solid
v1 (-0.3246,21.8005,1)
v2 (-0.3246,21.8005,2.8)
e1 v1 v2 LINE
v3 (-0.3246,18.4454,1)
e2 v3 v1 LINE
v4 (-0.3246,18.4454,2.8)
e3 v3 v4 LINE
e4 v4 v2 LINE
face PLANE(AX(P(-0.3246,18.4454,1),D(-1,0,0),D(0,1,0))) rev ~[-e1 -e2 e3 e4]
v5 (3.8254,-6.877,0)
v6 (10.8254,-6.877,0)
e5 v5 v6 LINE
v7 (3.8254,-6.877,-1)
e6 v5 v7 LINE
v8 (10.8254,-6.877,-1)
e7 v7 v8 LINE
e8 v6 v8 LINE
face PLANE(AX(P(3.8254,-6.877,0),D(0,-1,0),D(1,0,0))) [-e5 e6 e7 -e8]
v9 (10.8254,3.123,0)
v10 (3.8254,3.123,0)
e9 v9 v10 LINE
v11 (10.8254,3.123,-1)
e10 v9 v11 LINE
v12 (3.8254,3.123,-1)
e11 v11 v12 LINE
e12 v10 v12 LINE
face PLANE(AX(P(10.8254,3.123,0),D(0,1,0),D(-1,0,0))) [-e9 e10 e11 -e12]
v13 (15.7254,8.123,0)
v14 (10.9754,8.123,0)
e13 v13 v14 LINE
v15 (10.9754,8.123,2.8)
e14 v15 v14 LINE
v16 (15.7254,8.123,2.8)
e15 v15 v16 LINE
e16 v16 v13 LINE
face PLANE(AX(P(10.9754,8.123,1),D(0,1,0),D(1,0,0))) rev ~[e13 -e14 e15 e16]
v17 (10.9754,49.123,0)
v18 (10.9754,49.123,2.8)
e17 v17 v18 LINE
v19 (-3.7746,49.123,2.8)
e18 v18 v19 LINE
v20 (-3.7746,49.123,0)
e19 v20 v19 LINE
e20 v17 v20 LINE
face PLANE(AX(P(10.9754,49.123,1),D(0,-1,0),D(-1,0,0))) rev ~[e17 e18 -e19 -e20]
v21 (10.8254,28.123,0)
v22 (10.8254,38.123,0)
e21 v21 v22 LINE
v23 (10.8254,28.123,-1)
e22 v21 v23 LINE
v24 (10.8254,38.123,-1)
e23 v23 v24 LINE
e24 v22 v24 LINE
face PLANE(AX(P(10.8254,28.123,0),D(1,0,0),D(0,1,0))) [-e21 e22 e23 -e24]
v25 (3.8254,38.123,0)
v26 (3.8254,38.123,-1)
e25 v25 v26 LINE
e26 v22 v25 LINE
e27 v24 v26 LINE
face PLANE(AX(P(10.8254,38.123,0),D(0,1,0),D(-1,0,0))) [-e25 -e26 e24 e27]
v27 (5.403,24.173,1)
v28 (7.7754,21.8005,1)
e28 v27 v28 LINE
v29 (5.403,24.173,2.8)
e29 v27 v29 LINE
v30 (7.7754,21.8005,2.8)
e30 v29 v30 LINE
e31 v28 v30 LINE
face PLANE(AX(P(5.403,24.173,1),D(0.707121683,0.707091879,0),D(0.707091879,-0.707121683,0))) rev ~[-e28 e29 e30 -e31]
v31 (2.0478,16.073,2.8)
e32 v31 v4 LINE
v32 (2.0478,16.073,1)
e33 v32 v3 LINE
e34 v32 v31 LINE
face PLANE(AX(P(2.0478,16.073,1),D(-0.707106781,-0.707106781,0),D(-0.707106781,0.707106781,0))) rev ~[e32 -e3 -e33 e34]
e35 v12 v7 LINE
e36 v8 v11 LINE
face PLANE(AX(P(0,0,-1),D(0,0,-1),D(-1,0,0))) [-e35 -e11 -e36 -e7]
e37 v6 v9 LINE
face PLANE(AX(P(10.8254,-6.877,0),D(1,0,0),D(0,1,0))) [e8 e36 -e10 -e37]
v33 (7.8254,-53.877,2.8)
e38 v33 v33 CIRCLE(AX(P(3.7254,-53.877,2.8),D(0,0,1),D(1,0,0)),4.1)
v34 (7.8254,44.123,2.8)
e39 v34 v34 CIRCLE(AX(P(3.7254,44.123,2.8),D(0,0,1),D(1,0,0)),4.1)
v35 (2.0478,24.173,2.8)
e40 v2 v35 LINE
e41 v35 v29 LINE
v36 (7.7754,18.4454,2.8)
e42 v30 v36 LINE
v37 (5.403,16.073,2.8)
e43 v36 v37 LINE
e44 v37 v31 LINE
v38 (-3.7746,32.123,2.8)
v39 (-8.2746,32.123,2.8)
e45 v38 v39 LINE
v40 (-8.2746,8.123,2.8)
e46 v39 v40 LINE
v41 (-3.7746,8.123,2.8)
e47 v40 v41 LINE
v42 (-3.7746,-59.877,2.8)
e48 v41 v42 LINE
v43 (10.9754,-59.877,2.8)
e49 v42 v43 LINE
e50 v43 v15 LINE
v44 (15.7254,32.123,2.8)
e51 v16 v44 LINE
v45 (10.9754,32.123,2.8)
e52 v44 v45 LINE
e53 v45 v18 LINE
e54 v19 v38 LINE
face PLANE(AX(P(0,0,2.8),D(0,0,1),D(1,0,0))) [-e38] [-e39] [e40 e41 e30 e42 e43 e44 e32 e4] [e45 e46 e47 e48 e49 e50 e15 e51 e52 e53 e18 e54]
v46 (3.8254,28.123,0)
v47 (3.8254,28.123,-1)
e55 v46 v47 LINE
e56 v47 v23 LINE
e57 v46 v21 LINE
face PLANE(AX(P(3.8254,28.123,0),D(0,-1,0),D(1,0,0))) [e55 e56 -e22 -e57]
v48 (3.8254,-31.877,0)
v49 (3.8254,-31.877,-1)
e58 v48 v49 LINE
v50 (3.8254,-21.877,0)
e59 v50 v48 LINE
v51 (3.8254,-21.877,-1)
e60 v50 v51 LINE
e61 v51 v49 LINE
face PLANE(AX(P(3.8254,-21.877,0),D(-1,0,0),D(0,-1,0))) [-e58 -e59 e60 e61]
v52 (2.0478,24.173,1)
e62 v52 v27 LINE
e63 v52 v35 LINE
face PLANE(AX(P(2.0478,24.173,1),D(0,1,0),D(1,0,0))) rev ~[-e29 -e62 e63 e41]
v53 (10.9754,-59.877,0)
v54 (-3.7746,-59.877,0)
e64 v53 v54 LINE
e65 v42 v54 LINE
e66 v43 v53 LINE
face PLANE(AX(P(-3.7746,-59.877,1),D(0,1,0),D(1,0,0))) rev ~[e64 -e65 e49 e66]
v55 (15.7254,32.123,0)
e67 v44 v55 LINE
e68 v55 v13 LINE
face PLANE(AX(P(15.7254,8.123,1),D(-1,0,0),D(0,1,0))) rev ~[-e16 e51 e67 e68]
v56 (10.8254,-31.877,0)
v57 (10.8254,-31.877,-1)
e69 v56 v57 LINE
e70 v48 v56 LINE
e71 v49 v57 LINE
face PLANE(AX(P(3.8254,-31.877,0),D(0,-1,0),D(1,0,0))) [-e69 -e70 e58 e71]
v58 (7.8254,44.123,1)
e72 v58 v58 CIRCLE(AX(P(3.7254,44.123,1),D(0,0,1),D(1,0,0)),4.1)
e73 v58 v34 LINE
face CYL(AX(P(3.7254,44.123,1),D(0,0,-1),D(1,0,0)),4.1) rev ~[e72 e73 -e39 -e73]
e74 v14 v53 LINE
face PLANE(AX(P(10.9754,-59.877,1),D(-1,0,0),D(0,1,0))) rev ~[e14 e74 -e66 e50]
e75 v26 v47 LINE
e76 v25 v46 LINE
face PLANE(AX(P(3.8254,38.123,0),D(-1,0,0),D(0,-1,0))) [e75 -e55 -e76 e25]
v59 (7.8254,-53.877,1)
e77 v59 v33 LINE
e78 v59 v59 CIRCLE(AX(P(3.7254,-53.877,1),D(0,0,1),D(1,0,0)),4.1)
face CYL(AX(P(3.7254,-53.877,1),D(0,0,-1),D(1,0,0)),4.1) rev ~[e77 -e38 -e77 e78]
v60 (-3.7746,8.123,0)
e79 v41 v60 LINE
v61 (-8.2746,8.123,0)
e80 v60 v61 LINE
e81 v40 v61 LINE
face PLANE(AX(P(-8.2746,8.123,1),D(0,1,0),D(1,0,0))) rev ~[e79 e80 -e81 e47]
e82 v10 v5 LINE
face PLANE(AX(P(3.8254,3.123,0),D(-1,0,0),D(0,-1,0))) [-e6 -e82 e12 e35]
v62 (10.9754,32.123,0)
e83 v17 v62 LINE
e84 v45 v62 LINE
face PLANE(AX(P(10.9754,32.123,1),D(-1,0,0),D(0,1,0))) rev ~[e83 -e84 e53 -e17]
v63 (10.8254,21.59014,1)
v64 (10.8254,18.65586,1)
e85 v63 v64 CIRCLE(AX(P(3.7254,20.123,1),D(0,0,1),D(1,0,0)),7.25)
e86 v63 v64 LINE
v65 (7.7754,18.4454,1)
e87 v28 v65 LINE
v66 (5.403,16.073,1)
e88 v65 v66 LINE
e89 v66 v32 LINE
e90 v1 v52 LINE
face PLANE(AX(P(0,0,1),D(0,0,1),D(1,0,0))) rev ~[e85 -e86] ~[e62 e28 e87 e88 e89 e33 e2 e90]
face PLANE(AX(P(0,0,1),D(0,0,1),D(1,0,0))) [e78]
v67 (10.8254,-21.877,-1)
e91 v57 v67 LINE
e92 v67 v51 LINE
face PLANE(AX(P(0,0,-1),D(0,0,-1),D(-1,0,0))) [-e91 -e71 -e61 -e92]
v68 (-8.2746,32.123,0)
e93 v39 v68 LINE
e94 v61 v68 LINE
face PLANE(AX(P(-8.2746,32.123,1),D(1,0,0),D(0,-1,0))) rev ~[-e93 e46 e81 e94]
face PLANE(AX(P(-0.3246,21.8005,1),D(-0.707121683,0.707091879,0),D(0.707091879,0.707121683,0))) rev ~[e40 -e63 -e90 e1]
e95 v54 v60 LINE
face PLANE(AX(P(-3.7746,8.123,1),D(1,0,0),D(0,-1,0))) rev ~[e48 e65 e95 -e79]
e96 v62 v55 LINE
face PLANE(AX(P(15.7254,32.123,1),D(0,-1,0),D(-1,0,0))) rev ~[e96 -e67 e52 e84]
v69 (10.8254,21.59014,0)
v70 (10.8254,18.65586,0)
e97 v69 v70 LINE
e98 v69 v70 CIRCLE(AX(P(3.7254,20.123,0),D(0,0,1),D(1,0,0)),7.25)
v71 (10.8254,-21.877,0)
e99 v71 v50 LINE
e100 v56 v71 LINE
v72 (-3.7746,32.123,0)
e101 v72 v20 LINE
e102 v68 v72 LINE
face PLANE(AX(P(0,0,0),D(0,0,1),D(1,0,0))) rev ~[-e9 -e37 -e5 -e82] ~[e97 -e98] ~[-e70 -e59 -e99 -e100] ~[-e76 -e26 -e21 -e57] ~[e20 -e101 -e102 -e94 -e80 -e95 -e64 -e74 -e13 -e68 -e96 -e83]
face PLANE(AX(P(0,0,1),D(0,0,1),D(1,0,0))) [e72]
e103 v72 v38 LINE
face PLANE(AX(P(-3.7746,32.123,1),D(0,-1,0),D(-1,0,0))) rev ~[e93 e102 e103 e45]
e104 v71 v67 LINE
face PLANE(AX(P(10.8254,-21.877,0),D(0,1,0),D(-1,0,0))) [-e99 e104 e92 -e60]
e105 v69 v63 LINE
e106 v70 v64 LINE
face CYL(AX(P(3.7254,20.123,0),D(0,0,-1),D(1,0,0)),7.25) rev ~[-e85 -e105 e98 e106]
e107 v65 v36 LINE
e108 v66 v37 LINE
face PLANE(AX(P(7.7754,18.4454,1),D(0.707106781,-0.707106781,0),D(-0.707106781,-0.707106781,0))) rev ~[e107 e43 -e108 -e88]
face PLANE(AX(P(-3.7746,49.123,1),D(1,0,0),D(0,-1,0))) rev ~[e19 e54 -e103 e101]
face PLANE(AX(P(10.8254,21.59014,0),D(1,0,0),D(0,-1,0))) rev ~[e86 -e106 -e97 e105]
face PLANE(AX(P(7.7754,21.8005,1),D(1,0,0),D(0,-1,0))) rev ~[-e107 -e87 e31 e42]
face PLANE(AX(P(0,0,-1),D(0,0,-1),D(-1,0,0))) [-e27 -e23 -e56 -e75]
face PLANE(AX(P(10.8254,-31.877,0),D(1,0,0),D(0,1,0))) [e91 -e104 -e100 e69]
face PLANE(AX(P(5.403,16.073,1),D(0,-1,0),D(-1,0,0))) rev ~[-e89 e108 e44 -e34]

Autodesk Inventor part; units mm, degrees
ref_plane "YZ Plane" through (0, 0, 0) normal (1, 0, 0) x (0, 1, 0)
ref_plane "XZ Plane" through (0, 0, 0) normal (0, 1, 0) x (-1, 0, 0)
ref_plane "XY Plane" through (0, 0, 0) normal (0, 0, 1) x (1, 0, 0)
ref_plane "Arbeitsebene1" through (0, 0, 0) normal (0, 0, 1) x (1, 0, 0)
sketch "Skizze1" plane through (0, 0, 0) normal (0, 0, 1) x (1, 0, 0)
  circle A0 centre (-26.7746, 32.123) radius 1.5 construction
  circle A1 centre (15.7254, 11.123) radius 1.5 construction
  circle A2 centre (-26.2746, -24.877) radius 1.5 construction
  circle A3 centre (12.7254, -26.877) radius 1.5 construction
  circle A4 centre (12.7254, 30.123) radius 1.5 construction
  line L0 (11.0254, 3.323) -> (11.0254, -7.077) construction
  line L1 (11.0254, -7.077) -> (3.6254, -7.077) construction
  line L2 (3.6254, -7.077) -> (3.6254, 3.323) construction
  line L3 (3.6254, 3.323) -> (11.0254, 3.323) construction
  line L4 (3.6254, -32.077) -> (3.6254, -21.677) construction
  line L5 (3.6254, -21.677) -> (11.0254, -21.677) construction
  line L6 (11.0254, -21.677) -> (11.0254, -32.077) construction
  line L7 (11.0254, -32.077) -> (3.6254, -32.077) construction
  line L8 (11.0254, 27.923) -> (3.6254, 27.923) construction
  line L9 (3.6254, 27.923) -> (3.6254, 38.323) construction
  line L10 (3.6254, 38.323) -> (11.0254, 38.323) construction
  line L11 (11.0254, 38.323) -> (11.0254, 27.923) construction
  line L12 (-28.2746, 30.123) -> (-28.2746, -34.877) construction
  line L13 (-28.2746, -34.877) -> (-3.7746, -34.877) construction
  line L14 (-3.7746, -34.877) -> (-3.7746, -59.877) construction
  line L15 (-3.7746, -59.877) -> (10.8254, -59.877) construction
  line L16 (10.8254, -59.877) -> (10.8254, -34.877) construction
  line L17 (10.8254, -34.877) -> (20.2254, -34.877) construction
  line L18 (20.2254, -34.877) -> (20.2254, 39.123) construction
  line L19 (20.2254, 39.123) -> (10.8254, 39.123) construction
  line L20 (10.8254, 39.123) -> (10.8254, 49.123) construction
  line L21 (10.8254, 49.123) -> (-3.7746, 49.123) construction
  line L22 (-3.7746, 49.123) -> (-3.7746, 39.123) construction
  line L23 (-3.7746, 39.123) -> (-29.2746, 39.123) construction
  line L24 (-29.2746, 39.123) -> (-29.2746, 30.123) construction
  line L25 (-29.2746, 30.123) -> (-28.2746, 30.123) construction
  circle A5 centre (3.7254, 20.123) radius 7.5 construction
  line L26 (-3.7746, 49.123) -> (10.8254, 49.123) construction
  line L27 (10.8254, 49.123) -> (10.8254, -59.877) construction
  line L28 (10.8254, -59.877) -> (-3.7746, -59.877) construction
  line L29 (-3.7746, -59.877) -> (-3.7746, 49.123) construction
  line L30 (-3.7746, 49.123) -> (10.8254, 49.123)
  line L31 (10.8254, 49.123) -> (10.8254, -59.877)
  line L32 (10.8254, -59.877) -> (-3.7746, -59.877)
  line L33 (-3.7746, -59.877) -> (-3.7746, 49.123)
  circle A6 centre (3.7254, 44.123) radius 4.1 projected
  circle A7 centre (3.7254, -53.877) radius 4.1 projected
  line L34 (-8.2746, 32.123) -> (15.7254, 32.123)
  line L35 (15.7254, 32.123) -> (15.7254, 8.123)
  line L36 (15.7254, 8.123) -> (-8.2746, 8.123)
  line L37 (-8.2746, 8.123) -> (-8.2746, 32.123)
  line L38 (-8.2746, 32.123) -> (15.7254, 8.123) construction
  line L39 (15.7254, 32.123) -> (-8.2746, 8.123) construction
  circle A8 centre (3.7254, 20.123) radius 7.5
  circle A9 centre (3.7254, 20.123) radius 7.25
  line L40 (10.8254, 49.123) -> (10.9754, 49.123)
  line L41 (10.9754, 49.123) -> (10.9754, -59.877)
  line L42 (10.9754, -59.877) -> (10.8254, -59.877)
  line L43 (10.8254, -59.877) -> (10.8254, 49.123)
  point P0 (0, 0)
  dimension "d0" = 24
  dimension "d1" = 24
  dimension "d2" = 14.5
  dimension "d5" = 0.15
extrude "Extrusion1" add sketch "Skizze1" along normal blind 1 contours L30 L31 L34 L33 | L40 L41 L34 L31 | L34 L31 A8 L33 | L33 L36 L37 L34 | L34 L41 A8 L31 | A8 L31 L36 L33 | A8 L31 A9 | A8 L41 A9 L31 | L34 L35 L36 L41 A8 | L36 L31 L32 L33 | A8 L41 L36 L31 | L31 A9 L41 A8 | A9 L31 | A8 L41 | L36 L41 L42 L31 | A6 | A7 picked at (10.8531, 19.7957)
sketch "Skizze2" plane through (0, 0, 0) normal (0, 0, -1) x (-1, 0, 0)
  circle A0 centre (26.7746, 32.123) radius 1.5 projected
  circle A1 centre (-15.7254, 11.123) radius 1.5 projected
  circle A2 centre (26.2746, -24.877) radius 1.5 projected
  circle A3 centre (-12.7254, -26.877) radius 1.5 projected
  circle A4 centre (-12.7254, 30.123) radius 1.5 projected
  line L0 (-11.0254, 3.323) -> (-11.0254, -7.077) projected
  line L1 (-11.0254, -7.077) -> (-3.6254, -7.077) projected
  line L2 (-3.6254, -7.077) -> (-3.6254, 3.323) projected
  line L3 (-3.6254, 3.323) -> (-11.0254, 3.323) projected
  line L4 (-3.6254, -32.077) -> (-3.6254, -21.677) projected
  line L5 (-3.6254, -21.677) -> (-11.0254, -21.677) projected
  line L6 (-11.0254, -21.677) -> (-11.0254, -32.077) projected
  line L7 (-11.0254, -32.077) -> (-3.6254, -32.077) projected
  line L8 (-11.0254, 27.923) -> (-3.6254, 27.923) projected
  line L9 (-3.6254, 27.923) -> (-3.6254, 38.323) projected
  line L10 (-3.6254, 38.323) -> (-11.0254, 38.323) projected
  line L11 (-11.0254, 38.323) -> (-11.0254, 27.923) projected
  line L12 (28.2746, 30.123) -> (28.2746, -34.877) projected
  line L13 (28.2746, -34.877) -> (3.7746, -34.877) projected
  line L14 (3.7746, -34.877) -> (3.7746, -59.877) projected
  line L15 (3.7746, -59.877) -> (-10.8254, -59.877) projected
  line L16 (-10.8254, -59.877) -> (-10.8254, -34.877) projected
  line L17 (-10.8254, -34.877) -> (-20.2254, -34.877) projected
  line L18 (-20.2254, -34.877) -> (-20.2254, 39.123) projected
  line L19 (-20.2254, 39.123) -> (-10.8254, 39.123) projected
  line L20 (-10.8254, 39.123) -> (-10.8254, 49.123) projected
  line L21 (-10.8254, 49.123) -> (3.7746, 49.123) projected
  line L22 (3.7746, 49.123) -> (3.7746, 39.123) projected
  line L23 (3.7746, 39.123) -> (29.2746, 39.123) projected
  line L24 (29.2746, 39.123) -> (29.2746, 30.123) projected
  line L25 (29.2746, 30.123) -> (28.2746, 30.123) projected
  circle A5 centre (-3.7254, 20.123) radius 7.5 projected
  line L26 (-3.8254, 38.123) -> (-3.8254, 28.123)
  line L27 (-3.8254, 28.123) -> (-10.8254, 28.123)
  line L28 (-10.8254, 28.123) -> (-10.8254, 38.123)
  line L29 (-10.8254, 38.123) -> (-3.8254, 38.123)
  line L30 (-3.8254, 3.123) -> (-3.8254, -6.877)
  line L31 (-3.8254, -6.877) -> (-10.8254, -6.877)
  line L32 (-10.8254, -6.877) -> (-10.8254, 3.123)
  line L33 (-10.8254, 3.123) -> (-3.8254, 3.123)
  line L34 (-10.8254, -21.877) -> (-3.8254, -21.877)
  line L35 (-3.8254, -21.877) -> (-3.8254, -31.877)
  line L36 (-3.8254, -31.877) -> (-10.8254, -31.877)
  line L37 (-10.8254, -31.877) -> (-10.8254, -21.877)
  point P0 (0, 0)
  dimension "d7" = 0.2
  dimension "d8" = 0.2
  dimension "d9" = 0.2
extrude "Extrusion2" add sketch "Skizze2" along normal blind 1 contours L26 L27 L28 L29 | L30 L31 L32 L33 | L34 L35 L36 L37
sketch "Skizze3" plane through (0, 0, 1) normal (0, 0, 1) x (1, 0, 0)
  circle A0 centre (3.7254, 20.123) radius 3.5 construction
  arc A1 (-0.3746, 17.023) -> (0.6254, 16.023) centre (0.6254, 17.023) ccw construction
  line L0 (0.6254, 16.023) -> (6.8254, 16.023) construction
  arc A2 (6.8254, 16.023) -> (7.8254, 17.023) centre (6.8254, 17.023) ccw construction
  line L1 (7.8254, 17.023) -> (7.8254, 18.7249) construction
  line L2 (7.8254, 18.7249) -> (9.8254, 18.7249) construction
  line L3 (9.8254, 19.2249) -> (9.8254, 18.7249) construction
  line L4 (7.8254, 19.2249) -> (9.8254, 19.2249) construction
  line L5 (7.8254, 19.2249) -> (7.8254, 21.021) construction
  line L6 (7.8254, 21.021) -> (9.8254, 21.021) construction
  line L7 (9.8254, 21.521) -> (9.8254, 21.021) construction
  line L8 (7.8254, 21.521) -> (9.8254, 21.521) construction
  line L9 (7.8254, 21.521) -> (7.8254, 23.223) construction
  arc A3 (7.8254, 23.223) -> (6.8254, 24.223) centre (6.8254, 23.223) ccw construction
  line L10 (6.8254, 24.223) -> (0.6254, 24.223) construction
  arc A4 (0.6254, 24.223) -> (-0.3746, 23.223) centre (0.6254, 23.223) ccw construction
  line L11 (-0.3746, 23.223) -> (-0.3746, 17.023) construction
  line L12 (10.9754, 49.123) -> (-3.7746, 49.123) projected
  line L13 (-3.7746, 49.123) -> (-3.7746, 32.123) projected
  line L14 (-3.7746, 32.123) -> (-8.2746, 32.123) projected
  line L15 (-8.2746, 32.123) -> (-8.2746, 8.123) projected
  line L16 (-8.2746, 8.123) -> (-3.7746, 8.123) projected
  line L17 (-3.7746, 8.123) -> (-3.7746, -59.877) projected
  line L18 (-3.7746, -59.877) -> (10.9754, -59.877) projected
  line L19 (10.9754, -59.877) -> (10.9754, 8.123) projected
  line L20 (10.9754, 8.123) -> (15.7254, 8.123) projected
  line L21 (15.7254, 8.123) -> (15.7254, 32.123) projected
  line L22 (15.7254, 32.123) -> (10.9754, 32.123) projected
  line L23 (10.9754, 32.123) -> (10.9754, 49.123) projected
  circle A5 centre (3.7254, 44.123) radius 4.1 projected
  circle A6 centre (3.7254, -53.877) radius 4.1 projected
  line L24 (-0.3246, 18.4454) -> (-0.3246, 21.8005)
  line L25 (-0.3246, 21.8005) -> (2.0478, 24.173)
  line L26 (2.0478, 24.173) -> (5.403, 24.173)
  line L27 (5.403, 24.173) -> (7.7754, 21.8005)
  line L28 (7.7754, 21.8005) -> (7.7754, 18.4454)
  line L29 (7.7754, 18.4454) -> (5.403, 16.073)
  line L30 (5.403, 16.073) -> (2.0478, 16.073)
  line L31 (2.0478, 16.073) -> (-0.3246, 18.4454)
  line L32 (-8.2746, 32.123) -> (-8.2746, 8.123) projected
  point P0 (0, 0)
  dimension "d16" = 8.1
extrude "Extrusion3" add sketch "Skizze3" along normal blind 1.8
properties part number "02_Lensadapter"
